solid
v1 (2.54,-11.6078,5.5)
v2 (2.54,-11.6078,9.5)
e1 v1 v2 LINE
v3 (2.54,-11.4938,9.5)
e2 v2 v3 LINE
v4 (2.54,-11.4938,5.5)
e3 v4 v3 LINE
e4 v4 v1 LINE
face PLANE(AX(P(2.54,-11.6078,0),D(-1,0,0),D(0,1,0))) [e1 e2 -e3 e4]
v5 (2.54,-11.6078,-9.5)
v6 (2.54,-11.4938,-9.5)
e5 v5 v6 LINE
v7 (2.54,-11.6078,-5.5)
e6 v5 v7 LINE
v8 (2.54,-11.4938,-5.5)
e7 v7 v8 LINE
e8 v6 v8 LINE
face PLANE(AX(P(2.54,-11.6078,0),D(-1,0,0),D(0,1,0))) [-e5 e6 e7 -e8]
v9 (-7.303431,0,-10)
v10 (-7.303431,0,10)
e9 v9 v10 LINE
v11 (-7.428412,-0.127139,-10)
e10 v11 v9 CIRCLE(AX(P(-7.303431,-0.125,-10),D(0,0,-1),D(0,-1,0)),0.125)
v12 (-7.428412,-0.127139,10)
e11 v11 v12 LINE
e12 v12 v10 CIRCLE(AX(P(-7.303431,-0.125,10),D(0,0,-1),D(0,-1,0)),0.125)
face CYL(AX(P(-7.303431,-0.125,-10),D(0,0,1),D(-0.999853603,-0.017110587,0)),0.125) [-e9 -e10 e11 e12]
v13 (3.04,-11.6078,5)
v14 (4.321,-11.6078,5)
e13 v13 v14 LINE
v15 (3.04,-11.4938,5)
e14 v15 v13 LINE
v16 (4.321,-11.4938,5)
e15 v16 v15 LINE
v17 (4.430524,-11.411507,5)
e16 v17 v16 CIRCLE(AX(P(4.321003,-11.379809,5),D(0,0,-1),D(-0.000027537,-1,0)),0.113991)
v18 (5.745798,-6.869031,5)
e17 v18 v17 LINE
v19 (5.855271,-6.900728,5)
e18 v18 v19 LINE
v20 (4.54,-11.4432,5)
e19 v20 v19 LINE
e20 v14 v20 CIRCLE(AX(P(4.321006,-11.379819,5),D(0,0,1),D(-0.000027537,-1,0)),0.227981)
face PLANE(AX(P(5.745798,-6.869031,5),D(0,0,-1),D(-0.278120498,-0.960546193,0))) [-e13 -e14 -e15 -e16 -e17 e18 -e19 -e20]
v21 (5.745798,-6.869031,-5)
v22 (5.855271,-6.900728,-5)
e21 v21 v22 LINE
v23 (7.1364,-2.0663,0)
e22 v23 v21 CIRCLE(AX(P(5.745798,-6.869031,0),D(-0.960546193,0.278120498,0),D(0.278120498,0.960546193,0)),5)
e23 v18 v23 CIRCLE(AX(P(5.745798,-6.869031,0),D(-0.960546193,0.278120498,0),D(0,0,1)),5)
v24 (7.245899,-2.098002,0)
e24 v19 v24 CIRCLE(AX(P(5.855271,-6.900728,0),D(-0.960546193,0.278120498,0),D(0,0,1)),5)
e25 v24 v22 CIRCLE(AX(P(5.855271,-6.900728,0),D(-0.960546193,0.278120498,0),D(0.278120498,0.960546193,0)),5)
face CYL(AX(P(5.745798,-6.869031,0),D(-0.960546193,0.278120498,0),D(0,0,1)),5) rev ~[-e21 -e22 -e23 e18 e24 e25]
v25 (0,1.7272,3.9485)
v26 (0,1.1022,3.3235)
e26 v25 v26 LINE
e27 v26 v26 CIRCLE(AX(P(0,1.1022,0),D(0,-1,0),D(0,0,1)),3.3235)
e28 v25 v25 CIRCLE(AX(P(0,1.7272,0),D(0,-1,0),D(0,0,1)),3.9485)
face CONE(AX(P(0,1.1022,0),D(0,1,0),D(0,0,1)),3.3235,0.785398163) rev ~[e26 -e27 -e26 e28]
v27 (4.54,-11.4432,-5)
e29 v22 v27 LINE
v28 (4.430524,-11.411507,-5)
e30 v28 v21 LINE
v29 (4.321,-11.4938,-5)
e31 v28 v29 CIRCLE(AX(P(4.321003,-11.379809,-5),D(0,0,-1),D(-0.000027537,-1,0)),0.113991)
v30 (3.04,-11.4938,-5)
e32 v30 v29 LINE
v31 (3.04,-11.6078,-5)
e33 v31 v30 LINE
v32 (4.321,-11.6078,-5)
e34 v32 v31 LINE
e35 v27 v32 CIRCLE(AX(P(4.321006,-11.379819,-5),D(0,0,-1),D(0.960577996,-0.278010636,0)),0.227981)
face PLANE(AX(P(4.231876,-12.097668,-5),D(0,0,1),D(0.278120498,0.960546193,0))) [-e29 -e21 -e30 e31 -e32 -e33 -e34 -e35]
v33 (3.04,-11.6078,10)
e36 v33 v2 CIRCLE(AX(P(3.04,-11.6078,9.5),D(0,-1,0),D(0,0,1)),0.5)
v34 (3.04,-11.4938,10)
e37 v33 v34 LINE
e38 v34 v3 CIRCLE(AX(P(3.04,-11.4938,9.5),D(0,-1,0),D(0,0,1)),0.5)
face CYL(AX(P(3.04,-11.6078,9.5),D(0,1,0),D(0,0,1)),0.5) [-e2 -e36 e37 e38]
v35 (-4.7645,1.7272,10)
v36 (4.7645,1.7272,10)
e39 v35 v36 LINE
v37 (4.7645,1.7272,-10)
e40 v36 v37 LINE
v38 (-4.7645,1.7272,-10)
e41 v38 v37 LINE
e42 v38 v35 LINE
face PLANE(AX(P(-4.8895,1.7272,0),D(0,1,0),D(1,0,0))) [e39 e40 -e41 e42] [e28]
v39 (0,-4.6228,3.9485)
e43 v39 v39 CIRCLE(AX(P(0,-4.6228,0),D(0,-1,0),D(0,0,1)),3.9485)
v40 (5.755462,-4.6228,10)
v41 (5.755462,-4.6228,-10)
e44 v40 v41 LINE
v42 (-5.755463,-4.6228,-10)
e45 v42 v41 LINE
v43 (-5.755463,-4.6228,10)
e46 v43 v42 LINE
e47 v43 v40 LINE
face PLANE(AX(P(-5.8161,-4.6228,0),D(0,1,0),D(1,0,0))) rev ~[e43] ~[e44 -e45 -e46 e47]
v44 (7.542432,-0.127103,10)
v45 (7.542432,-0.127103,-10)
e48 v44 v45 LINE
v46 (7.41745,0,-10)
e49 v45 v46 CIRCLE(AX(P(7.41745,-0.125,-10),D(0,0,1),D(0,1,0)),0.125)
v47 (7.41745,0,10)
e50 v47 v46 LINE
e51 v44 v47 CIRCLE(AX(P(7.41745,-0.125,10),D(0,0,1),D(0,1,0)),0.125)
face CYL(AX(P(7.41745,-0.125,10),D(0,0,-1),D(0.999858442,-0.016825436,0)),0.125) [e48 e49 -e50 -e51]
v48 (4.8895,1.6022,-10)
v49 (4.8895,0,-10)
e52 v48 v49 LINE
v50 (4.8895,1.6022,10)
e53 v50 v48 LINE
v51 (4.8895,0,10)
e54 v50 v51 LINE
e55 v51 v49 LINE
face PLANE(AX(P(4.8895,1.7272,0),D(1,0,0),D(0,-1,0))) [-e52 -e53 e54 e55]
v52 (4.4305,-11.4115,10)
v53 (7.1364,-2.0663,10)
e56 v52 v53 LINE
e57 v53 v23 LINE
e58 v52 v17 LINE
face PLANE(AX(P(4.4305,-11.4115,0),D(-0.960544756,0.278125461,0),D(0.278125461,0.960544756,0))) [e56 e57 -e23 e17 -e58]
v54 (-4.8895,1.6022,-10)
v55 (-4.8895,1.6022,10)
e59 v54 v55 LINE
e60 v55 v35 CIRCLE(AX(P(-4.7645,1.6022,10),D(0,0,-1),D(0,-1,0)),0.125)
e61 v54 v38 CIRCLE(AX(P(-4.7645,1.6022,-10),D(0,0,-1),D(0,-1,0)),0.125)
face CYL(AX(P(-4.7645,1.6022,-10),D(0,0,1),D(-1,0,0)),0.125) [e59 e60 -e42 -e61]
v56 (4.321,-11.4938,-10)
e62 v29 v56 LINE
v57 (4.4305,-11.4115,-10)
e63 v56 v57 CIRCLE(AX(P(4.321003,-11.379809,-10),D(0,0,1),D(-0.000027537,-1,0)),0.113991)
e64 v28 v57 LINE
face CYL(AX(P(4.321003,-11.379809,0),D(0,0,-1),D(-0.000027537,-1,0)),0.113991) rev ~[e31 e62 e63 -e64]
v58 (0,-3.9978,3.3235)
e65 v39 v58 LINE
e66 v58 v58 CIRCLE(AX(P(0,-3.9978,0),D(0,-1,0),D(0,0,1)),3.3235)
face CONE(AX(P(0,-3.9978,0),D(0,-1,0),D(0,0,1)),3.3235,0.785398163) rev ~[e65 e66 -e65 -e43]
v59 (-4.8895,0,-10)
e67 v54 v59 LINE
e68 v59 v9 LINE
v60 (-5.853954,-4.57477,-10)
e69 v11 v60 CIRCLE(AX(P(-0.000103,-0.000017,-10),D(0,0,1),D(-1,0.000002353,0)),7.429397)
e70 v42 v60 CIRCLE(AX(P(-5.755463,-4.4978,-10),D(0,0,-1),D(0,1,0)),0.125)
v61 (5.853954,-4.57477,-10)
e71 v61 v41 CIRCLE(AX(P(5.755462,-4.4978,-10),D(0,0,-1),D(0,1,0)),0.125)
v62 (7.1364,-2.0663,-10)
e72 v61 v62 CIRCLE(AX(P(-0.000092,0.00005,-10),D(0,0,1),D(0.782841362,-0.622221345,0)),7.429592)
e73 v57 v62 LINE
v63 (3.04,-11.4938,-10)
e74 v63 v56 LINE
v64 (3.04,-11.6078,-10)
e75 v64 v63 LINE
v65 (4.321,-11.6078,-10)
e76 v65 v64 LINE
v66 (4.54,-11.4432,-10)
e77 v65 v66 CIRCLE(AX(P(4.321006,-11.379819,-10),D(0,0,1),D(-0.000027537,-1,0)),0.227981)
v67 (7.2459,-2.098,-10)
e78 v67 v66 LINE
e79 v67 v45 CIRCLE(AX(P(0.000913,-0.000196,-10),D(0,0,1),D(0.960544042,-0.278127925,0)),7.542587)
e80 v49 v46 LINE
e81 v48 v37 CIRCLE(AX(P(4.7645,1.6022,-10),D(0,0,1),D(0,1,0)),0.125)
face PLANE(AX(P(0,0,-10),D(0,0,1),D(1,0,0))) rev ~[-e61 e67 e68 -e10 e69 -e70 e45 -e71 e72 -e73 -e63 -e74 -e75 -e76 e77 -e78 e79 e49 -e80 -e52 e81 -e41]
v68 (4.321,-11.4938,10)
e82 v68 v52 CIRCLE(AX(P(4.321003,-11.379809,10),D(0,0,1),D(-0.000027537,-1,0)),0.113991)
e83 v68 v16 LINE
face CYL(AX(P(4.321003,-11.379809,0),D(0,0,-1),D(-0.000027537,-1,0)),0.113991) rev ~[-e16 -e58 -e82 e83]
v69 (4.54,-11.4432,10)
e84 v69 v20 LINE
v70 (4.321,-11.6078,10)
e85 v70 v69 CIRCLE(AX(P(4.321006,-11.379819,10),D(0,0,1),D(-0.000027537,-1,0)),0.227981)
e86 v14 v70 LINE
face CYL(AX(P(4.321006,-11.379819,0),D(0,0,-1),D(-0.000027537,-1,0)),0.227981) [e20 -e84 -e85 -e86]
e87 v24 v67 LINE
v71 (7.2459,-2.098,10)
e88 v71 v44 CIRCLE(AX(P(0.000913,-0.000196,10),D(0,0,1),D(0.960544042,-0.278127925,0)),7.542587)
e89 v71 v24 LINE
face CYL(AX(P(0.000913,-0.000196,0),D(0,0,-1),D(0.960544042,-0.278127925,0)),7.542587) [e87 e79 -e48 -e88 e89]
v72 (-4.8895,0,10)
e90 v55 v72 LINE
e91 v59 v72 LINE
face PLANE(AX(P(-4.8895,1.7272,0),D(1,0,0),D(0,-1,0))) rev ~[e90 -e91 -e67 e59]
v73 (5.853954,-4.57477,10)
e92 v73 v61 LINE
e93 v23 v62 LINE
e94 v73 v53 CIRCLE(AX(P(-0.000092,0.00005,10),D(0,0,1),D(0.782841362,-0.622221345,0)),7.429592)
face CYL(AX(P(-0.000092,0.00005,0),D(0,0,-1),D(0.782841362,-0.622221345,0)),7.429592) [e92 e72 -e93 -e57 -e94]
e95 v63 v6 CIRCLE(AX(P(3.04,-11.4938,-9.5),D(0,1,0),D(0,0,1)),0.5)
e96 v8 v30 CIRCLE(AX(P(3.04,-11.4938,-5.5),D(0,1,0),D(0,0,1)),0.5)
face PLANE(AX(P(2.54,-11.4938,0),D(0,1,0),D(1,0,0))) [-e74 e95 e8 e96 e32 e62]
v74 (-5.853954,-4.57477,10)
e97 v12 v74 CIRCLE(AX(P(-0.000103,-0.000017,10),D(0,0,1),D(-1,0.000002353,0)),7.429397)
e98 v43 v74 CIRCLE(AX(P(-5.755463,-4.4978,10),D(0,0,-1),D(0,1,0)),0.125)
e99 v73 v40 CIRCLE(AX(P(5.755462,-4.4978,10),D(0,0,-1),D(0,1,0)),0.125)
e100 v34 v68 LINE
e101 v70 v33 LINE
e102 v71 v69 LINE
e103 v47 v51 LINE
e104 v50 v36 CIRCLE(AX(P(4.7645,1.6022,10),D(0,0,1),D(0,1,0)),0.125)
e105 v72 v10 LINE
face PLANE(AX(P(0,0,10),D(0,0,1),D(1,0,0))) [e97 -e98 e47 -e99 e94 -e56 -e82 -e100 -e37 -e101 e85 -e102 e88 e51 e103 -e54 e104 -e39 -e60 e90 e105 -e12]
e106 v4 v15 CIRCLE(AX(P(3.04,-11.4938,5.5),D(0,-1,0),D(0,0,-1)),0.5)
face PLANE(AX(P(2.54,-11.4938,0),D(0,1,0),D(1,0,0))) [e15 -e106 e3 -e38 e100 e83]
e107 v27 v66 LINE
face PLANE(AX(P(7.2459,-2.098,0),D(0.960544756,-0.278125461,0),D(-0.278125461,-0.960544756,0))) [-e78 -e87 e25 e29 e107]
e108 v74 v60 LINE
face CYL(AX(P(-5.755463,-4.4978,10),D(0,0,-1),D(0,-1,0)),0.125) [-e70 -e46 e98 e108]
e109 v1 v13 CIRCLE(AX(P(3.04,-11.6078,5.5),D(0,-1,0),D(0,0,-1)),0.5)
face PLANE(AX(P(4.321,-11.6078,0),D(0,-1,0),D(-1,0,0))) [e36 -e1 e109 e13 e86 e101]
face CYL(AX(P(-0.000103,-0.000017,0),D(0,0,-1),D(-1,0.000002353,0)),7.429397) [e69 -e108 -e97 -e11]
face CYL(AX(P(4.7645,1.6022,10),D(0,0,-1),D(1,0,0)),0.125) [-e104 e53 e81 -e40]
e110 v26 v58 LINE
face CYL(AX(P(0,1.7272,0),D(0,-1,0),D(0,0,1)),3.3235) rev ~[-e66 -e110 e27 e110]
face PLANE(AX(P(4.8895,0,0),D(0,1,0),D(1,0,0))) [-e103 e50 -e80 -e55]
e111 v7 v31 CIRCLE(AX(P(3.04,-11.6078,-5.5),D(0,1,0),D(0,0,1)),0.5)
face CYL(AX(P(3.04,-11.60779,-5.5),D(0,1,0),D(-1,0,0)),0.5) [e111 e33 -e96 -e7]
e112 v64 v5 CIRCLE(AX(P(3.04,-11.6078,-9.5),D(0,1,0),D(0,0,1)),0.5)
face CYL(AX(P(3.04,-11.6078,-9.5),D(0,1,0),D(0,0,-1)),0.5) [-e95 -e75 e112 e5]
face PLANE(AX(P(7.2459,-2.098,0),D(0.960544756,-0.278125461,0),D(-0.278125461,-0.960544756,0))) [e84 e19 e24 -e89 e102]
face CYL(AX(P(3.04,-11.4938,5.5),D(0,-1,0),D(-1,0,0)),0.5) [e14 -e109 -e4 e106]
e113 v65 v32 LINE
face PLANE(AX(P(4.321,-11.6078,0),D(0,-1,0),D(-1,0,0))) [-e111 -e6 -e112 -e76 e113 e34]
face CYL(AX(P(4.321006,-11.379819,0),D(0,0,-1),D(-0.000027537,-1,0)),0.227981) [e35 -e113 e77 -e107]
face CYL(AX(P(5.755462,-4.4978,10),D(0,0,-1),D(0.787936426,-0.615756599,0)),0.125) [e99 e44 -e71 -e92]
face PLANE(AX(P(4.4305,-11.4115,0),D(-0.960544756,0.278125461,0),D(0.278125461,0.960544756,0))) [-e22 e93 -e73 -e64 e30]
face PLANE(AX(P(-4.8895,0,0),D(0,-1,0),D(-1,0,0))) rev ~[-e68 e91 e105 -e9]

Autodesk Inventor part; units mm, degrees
ref_plane "YZ Plane" through (0, 0, 0) normal (1, 0, 0) x (0, 1, 0)
ref_plane "XZ Plane" through (0, 0, 0) normal (0, 1, 0) x (-1, 0, 0)
ref_plane "XY Plane" through (0, 0, 0) normal (0, 0, 1) x (1, 0, 0)
sketch "Sketch1" plane through (0, 0, 0) normal (0, 0, 1) x (1, 0, 0)
  line L0 (-4.8895, 1.7272) -> (4.8895, 1.7272)
  line L1 (4.8895, 1.7272) -> (4.8895, 0)
  line L2 (4.8895, 0) -> (7.4295, 0)
  line L3 (-4.8895, 1.7272) -> (-4.8895, 0)
  line L4 (-4.8895, 0) -> (-7.4295, 0)
  line L5 (0, 1.7272) -> (0, -4.6228) construction
  line L6 (-5.8161, -4.6228) -> (5.8161, -4.6228)
  arc A0 (5.8161, -4.6228) -> (7.4295, 0) centre (0, 0) ccw
  arc A1 (-7.4295, 0) -> (-5.8161, -4.6228) centre (0, 0) ccw
  dimension "d0" = 14.859
  dimension "d1" = 9.779
  dimension "d2" = 1.7272
  dimension "d3" = 6.35
extrude "Extrusion1" add sketch "Sketch1" along normal mid plane 20
sketch "Sketch2" plane through (-4.8895, 1.7272, 10) normal (0, 1, 0) x (1, 0, 0)
  point P0 (4.8895, 10)
  point P1 (4.8895, 10)
hole "Hole1" at (0, 1.7272, 0) direction (0, -1, 0) diameter 6.647 end through all thread size "M8x1.25" class "6H" standard "ANSI Metric M Profile"
sketch "Sketch3" plane through (0, 0, 0) normal (0, 0, 1) x (1, 0, 0)
  line L0 (2.54, -11.4938) -> (4.321, -11.4938)
  arc A0 (4.321, -11.4938) -> (4.4305, -11.4115) centre (4.321, -11.3798) ccw
  line L1 (4.4305, -11.4115) -> (7.1364, -2.0663)
  line L2 (7.2459, -2.098) -> (4.54, -11.4432)
  arc A1 (4.321, -11.6078) -> (4.54, -11.4432) centre (4.321, -11.3798) ccw
  line L3 (4.321, -11.6078) -> (2.54, -11.6078)
  line L4 (2.54, -11.6078) -> (2.54, -11.4938)
  arc A2 (7.2459, -2.098) -> (7.5435, 0) centre (0, 0) ccw
  line L5 (7.4295, 0) -> (7.5435, 0)
  arc A3 (7.1364, -2.0663) -> (7.4295, 0) centre (0, 0) ccw
  line L6 (7.4295, 0) -> (4.8895, 0) projected
  line L7 (4.8895, 1.7272) -> (-4.8895, 1.7272) projected
  dimension "d16" = 0.114
  dimension "d17" = 0.114
  dimension "d18" = 2
  dimension "d20" = 13.335
  dimension "d21" = 2.54
extrude "Extrusion2" add sketch "Sketch3" along normal mid plane 20
sketch "Sketch4" plane through (7.1364, -2.0663, -10) normal (-0.9605462, 0.2781205, 0) x (0, 0, 1)
  line L0 (10, 0) -> (10, 0)
  line L1 (15, -5) -> (15, -10.4434)
  line L2 (15, -10.4434) -> (5, -10.4434)
  line L3 (5, -10.4434) -> (5, -5)
  line L4 (20, -10.4434) -> (0, -10.4434) projected
  arc A0 (15, -5) -> (10, 0) centre (10, -5) ccw
  arc A1 (10, 0) -> (5, -5) centre (10, -5) ccw
  line L5 (20, 0) -> (0, 0) projected
  point P0 (10, 0)
  point P1 (10, -10.4434)
  dimension "d24" = 10
  dimension "d25" = 5
extrude "Extrusion3" cut sketch "Sketch4" against normal through all
sketch "Sketch5" plane through (7.2459, -2.098, 10) normal (0.9605462, -0.2781205, 0) x (0, 0, -1)
  line L0 (5, -5) -> (15, -5)
  line L1 (15, -5) -> (15, -10.4434)
  line L2 (15, -10.4434) -> (5, -10.4434)
  line L3 (5, -10.4434) -> (5, -5)
  line L4 (0, -10.4434) -> (20, -10.4434) projected
  line L5 (15, -5) -> (15, -9.7291) projected
extrude "Extrusion4" cut sketch "Sketch5" against normal blind 3
fillet "Fillet1" radius 0.5 4 edges at (2.54, -11.5508, 10) (2.54, -11.5508, 5) (2.54, -11.5508, -5) (2.54, -11.5508, -10)
fillet "Fillet2" radius 0.125 6 edges at (4.8895, 1.7272, 0) (-4.8895, 1.7272, 0) (-7.4295, 0, 0) (5.8161, -4.6228, 0) (-5.8161, -4.6228, 0) (7.5435, 0, 0)
chamfer "Chamfer1" distance 0.625 angle 45 2 edges at (0, 1.7272, -3.3235) (0, -4.6228, -3.3235)
equation "\"d16\" = d17"
properties part number "NUT, SPRING, MK, M8" material "Steel, MS"
